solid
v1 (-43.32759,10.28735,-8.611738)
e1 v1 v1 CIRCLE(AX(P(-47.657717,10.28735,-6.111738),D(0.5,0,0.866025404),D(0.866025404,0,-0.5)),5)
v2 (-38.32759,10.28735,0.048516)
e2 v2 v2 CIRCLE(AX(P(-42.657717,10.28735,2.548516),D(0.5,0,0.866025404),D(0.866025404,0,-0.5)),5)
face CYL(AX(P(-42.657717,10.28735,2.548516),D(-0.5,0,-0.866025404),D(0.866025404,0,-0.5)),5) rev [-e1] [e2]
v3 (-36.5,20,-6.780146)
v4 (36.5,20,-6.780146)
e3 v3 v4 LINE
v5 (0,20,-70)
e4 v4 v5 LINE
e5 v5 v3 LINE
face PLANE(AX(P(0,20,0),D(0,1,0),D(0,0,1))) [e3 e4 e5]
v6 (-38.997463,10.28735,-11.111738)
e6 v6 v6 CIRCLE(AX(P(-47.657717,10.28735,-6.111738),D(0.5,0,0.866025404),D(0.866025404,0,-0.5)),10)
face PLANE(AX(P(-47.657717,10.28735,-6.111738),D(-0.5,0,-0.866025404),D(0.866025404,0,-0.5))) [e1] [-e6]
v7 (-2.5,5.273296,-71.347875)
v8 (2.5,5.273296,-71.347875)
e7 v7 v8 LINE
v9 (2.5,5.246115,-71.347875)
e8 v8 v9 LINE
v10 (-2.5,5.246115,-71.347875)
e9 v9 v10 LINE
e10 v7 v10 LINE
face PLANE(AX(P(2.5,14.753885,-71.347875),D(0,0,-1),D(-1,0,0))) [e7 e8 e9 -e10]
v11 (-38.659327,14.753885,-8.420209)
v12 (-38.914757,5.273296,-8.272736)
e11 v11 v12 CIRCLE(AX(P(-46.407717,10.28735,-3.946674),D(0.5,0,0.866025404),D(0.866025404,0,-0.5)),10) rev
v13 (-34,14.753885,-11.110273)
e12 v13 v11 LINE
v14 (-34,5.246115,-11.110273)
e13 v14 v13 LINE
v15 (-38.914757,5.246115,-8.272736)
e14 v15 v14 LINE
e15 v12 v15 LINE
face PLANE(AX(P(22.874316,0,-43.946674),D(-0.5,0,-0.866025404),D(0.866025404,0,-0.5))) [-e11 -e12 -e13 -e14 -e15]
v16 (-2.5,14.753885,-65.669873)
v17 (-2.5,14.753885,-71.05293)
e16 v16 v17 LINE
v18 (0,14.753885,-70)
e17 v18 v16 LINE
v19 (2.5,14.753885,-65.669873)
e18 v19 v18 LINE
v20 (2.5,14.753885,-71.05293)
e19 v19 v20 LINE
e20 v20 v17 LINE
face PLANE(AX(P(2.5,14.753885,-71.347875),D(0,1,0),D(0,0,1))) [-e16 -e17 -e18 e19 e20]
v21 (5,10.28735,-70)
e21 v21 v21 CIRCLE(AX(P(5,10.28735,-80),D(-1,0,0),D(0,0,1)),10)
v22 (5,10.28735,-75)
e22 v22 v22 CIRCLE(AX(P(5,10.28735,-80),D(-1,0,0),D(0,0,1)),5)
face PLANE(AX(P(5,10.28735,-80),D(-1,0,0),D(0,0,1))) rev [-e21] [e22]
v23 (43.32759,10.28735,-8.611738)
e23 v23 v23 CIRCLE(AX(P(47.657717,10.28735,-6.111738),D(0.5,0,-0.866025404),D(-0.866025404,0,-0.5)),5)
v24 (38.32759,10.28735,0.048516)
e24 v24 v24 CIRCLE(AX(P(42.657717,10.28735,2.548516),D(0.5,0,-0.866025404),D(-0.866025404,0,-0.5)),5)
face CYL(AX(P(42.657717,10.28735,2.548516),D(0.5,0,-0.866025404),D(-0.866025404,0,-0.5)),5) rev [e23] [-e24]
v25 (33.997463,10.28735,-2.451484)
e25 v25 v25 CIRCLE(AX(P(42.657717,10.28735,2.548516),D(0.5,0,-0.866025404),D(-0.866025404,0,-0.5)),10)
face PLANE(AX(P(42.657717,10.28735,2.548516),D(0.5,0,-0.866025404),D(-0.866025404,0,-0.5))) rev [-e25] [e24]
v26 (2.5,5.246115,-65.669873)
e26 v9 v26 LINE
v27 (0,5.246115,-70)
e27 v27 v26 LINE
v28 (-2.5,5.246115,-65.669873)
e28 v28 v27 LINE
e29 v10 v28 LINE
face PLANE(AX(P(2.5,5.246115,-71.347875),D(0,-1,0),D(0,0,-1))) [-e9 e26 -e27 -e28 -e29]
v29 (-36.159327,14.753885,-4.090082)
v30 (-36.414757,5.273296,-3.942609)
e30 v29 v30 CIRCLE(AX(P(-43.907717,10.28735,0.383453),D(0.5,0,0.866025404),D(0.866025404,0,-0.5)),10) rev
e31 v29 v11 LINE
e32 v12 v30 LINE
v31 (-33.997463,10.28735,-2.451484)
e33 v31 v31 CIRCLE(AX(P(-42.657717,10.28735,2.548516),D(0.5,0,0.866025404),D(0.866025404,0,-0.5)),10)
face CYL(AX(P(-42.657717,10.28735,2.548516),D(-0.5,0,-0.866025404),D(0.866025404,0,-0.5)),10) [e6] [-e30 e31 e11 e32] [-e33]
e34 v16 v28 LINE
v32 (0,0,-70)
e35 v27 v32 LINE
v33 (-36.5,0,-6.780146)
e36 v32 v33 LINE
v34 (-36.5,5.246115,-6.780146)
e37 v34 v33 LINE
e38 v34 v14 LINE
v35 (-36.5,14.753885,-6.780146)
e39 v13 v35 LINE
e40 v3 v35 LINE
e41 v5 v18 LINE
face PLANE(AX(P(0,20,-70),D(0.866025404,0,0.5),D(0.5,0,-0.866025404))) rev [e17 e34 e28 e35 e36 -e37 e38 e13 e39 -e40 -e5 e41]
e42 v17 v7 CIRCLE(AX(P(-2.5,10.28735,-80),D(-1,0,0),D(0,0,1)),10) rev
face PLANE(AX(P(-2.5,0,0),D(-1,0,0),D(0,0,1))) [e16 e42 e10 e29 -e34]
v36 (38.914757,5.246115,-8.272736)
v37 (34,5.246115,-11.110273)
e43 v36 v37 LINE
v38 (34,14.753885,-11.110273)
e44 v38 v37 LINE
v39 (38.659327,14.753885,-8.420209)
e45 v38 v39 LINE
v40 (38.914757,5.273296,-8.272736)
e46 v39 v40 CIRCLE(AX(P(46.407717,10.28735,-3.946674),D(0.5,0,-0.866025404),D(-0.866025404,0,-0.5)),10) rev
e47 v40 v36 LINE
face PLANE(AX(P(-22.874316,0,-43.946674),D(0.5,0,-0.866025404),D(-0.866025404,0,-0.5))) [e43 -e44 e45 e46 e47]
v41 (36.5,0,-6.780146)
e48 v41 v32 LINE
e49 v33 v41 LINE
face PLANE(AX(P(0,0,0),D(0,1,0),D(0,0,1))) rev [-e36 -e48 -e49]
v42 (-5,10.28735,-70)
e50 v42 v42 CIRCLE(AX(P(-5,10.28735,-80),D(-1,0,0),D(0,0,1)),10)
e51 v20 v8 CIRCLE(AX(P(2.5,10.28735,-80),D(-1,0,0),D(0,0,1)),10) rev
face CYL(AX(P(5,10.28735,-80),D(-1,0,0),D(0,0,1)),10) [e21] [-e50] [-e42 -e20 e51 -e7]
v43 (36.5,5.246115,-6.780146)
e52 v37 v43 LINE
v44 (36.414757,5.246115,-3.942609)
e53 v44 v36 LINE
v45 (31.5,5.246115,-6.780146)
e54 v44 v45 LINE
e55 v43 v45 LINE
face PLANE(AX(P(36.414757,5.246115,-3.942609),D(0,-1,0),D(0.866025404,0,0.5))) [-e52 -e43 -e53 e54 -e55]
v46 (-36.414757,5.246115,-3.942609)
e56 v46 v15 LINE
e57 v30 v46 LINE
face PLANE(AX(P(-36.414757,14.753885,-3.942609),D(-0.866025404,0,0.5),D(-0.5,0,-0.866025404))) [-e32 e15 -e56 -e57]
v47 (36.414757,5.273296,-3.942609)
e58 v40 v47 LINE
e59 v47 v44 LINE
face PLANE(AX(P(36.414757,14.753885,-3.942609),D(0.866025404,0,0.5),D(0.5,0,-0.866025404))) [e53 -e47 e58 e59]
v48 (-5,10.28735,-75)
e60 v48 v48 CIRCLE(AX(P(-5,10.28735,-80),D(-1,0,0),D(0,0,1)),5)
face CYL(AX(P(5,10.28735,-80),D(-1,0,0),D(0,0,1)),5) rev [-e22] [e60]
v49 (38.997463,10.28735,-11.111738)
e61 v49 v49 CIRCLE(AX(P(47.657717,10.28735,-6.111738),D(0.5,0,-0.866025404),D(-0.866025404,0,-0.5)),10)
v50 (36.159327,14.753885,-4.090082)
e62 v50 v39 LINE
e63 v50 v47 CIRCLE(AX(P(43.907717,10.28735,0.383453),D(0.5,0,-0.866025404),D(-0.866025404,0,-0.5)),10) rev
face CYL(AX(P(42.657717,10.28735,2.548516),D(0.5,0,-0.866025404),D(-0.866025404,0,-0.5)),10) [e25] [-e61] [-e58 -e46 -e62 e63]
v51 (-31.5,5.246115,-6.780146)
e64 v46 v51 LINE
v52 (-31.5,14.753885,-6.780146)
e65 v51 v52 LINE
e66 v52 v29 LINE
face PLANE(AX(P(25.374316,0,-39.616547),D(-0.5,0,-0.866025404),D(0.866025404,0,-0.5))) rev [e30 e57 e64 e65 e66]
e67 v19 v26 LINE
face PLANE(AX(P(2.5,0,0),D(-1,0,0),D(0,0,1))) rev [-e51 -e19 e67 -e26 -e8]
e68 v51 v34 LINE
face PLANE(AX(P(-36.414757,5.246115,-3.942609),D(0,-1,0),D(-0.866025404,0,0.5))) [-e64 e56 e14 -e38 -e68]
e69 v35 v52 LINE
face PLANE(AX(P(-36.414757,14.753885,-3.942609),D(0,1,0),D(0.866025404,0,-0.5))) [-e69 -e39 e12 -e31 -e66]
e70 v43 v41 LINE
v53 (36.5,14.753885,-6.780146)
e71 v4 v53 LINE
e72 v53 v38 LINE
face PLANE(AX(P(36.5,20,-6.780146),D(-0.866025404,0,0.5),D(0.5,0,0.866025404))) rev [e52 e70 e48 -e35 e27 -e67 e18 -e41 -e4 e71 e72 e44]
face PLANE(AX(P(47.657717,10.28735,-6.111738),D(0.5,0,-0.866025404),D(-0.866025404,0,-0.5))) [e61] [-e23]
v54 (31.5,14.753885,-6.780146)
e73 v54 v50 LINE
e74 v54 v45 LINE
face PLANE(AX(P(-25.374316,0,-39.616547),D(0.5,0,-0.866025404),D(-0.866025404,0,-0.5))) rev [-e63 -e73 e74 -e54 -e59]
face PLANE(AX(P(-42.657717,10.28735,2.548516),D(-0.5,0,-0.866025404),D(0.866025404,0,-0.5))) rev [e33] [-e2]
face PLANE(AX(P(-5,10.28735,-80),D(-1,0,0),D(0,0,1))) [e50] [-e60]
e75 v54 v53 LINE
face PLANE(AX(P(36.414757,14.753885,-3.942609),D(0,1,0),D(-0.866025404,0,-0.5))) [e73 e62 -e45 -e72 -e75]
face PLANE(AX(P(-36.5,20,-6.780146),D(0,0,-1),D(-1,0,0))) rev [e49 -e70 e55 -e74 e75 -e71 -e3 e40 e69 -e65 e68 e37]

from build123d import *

# Parameters (mm, degrees)
BOSS_EXTRUDE1_DEPTH      = 20
BOSS_EXTRUDE2_DEPTH      = 5
BOSS_EXTRUDE2_DEPTH_BACK = 5
SKETCH3_R                = 10
SKETCH3_R_2              = 5
BOSS_EXTRUDE3_DEPTH      = 2.5
BOSS_EXTRUDE3_DEPTH_BACK = 2.5
SKETCH4_W                = 9.507770028
SKETCH4_H                = 1.347875139
MOVE_FACE1_BY            = 11.3
BODY_MOVE_COPY2_ANGLE    = 60
BODY_MOVE_COPY3_ANGLE    = 180


with BuildPart() as part:
    # Sketch1 → Boss-Extrude1 (new body)
    with BuildSketch(Plane(origin=(0, 0, 0), x_dir=(1, 0, 0), z_dir=(0, 1, 0))):
        Polygon((-36.5, 6.780145524), (36.5, 6.780145524), (0, 70), align=None)
    extrude(amount=BOSS_EXTRUDE1_DEPTH)


with BuildPart() as body_2:
    # Sketch3 → Boss-Extrude2 (new, two sides: drawn at the far end of the back side and taken through both)
    with BuildSketch(Plane(origin=(0, 0, 0), x_dir=(0, -1, 0), z_dir=(-1, 0, 0)).offset(-BOSS_EXTRUDE2_DEPTH_BACK)):
        with Locations(Location((-10.287349531, -80, 0), (0, 0, 90))):
            Circle(SKETCH3_R)
        with Locations(Location((-10.287349531, -80, 0), (0, 0, 90))):
            Circle(SKETCH3_R_2, mode=Mode.SUBTRACT)
    extrude(amount=BOSS_EXTRUDE2_DEPTH + BOSS_EXTRUDE2_DEPTH_BACK)

    # Sketch4 → Boss-Extrude3 (add, two sides: drawn at the far end of the back side and taken through both)
    with BuildSketch(Plane(origin=(0, 0, 0), x_dir=(0, -1, 0), z_dir=(-1, 0, 0)).offset(-BOSS_EXTRUDE3_DEPTH_BACK)):
        with Locations((-10, -70.673937569)):
            Rectangle(SKETCH4_W, SKETCH4_H)
    extrude(amount=BOSS_EXTRUDE3_DEPTH + BOSS_EXTRUDE3_DEPTH_BACK)

    # Move Face1: a face moved outward by 11.3
    extrude(body_2.faces().sort_by_distance((0, 10, -70))[0], amount=MOVE_FACE1_BY, dir=(0, 0, 1))


with BuildPart() as body_3:
    # Body-Move/Copy1: copy of body 2
    add(body_2.part.moved(Location((50, 0, 0))))


with BuildPart() as body_3_1:
    # Body-Move/Copy2: read off the stored shape, not the designer's step
    # Body-Move/Copy2: moved
    add(body_3.part.moved(Location((-25.8782217, 0, 45.4663337))).rotate(Axis((0, 0, 0), (0, 1, 0)), BODY_MOVE_COPY2_ANGLE))


with BuildPart() as body_3_2:
    # Body-Move/Copy3: moved
    add(body_3_1.part.rotate(Axis((-13.578099639, 0, -36.414437667), (0, 1, 0)), BODY_MOVE_COPY3_ANGLE))


with BuildPart() as body_3_3:
    # Body-Move/Copy4: moved
    add(body_3_2.part.moved(Location((60.621778265, 0, 35))))


with BuildPart() as body_3_4:
    # Body-Move/Copy5: read off the stored shape, not the designer's step
    # Body-Move/Copy5: moved
    add(body_3_3.part.moved(Location((-5.5290056, 0, -3.1921729))))


with BuildPart() as body_3_5:
    # Body-Move/Copy6: read off the stored shape, not the designer's step
    # Body-Move/Copy6: moved
    add(body_3_4.part.moved(Location((-0.625, 0, 1.0825318))))


with BuildPart() as body_4:
    # Mirror1: mirrored copy
    add(body_3_5.part.mirror(Plane.ZY))


with BuildPart() as part_1:
    add(part.part)

    # Combine1: union body 2, body 3, body 4
    add(body_2.part)
    add(body_3_5.part)
    add(body_4.part)


solid = part_1.part
